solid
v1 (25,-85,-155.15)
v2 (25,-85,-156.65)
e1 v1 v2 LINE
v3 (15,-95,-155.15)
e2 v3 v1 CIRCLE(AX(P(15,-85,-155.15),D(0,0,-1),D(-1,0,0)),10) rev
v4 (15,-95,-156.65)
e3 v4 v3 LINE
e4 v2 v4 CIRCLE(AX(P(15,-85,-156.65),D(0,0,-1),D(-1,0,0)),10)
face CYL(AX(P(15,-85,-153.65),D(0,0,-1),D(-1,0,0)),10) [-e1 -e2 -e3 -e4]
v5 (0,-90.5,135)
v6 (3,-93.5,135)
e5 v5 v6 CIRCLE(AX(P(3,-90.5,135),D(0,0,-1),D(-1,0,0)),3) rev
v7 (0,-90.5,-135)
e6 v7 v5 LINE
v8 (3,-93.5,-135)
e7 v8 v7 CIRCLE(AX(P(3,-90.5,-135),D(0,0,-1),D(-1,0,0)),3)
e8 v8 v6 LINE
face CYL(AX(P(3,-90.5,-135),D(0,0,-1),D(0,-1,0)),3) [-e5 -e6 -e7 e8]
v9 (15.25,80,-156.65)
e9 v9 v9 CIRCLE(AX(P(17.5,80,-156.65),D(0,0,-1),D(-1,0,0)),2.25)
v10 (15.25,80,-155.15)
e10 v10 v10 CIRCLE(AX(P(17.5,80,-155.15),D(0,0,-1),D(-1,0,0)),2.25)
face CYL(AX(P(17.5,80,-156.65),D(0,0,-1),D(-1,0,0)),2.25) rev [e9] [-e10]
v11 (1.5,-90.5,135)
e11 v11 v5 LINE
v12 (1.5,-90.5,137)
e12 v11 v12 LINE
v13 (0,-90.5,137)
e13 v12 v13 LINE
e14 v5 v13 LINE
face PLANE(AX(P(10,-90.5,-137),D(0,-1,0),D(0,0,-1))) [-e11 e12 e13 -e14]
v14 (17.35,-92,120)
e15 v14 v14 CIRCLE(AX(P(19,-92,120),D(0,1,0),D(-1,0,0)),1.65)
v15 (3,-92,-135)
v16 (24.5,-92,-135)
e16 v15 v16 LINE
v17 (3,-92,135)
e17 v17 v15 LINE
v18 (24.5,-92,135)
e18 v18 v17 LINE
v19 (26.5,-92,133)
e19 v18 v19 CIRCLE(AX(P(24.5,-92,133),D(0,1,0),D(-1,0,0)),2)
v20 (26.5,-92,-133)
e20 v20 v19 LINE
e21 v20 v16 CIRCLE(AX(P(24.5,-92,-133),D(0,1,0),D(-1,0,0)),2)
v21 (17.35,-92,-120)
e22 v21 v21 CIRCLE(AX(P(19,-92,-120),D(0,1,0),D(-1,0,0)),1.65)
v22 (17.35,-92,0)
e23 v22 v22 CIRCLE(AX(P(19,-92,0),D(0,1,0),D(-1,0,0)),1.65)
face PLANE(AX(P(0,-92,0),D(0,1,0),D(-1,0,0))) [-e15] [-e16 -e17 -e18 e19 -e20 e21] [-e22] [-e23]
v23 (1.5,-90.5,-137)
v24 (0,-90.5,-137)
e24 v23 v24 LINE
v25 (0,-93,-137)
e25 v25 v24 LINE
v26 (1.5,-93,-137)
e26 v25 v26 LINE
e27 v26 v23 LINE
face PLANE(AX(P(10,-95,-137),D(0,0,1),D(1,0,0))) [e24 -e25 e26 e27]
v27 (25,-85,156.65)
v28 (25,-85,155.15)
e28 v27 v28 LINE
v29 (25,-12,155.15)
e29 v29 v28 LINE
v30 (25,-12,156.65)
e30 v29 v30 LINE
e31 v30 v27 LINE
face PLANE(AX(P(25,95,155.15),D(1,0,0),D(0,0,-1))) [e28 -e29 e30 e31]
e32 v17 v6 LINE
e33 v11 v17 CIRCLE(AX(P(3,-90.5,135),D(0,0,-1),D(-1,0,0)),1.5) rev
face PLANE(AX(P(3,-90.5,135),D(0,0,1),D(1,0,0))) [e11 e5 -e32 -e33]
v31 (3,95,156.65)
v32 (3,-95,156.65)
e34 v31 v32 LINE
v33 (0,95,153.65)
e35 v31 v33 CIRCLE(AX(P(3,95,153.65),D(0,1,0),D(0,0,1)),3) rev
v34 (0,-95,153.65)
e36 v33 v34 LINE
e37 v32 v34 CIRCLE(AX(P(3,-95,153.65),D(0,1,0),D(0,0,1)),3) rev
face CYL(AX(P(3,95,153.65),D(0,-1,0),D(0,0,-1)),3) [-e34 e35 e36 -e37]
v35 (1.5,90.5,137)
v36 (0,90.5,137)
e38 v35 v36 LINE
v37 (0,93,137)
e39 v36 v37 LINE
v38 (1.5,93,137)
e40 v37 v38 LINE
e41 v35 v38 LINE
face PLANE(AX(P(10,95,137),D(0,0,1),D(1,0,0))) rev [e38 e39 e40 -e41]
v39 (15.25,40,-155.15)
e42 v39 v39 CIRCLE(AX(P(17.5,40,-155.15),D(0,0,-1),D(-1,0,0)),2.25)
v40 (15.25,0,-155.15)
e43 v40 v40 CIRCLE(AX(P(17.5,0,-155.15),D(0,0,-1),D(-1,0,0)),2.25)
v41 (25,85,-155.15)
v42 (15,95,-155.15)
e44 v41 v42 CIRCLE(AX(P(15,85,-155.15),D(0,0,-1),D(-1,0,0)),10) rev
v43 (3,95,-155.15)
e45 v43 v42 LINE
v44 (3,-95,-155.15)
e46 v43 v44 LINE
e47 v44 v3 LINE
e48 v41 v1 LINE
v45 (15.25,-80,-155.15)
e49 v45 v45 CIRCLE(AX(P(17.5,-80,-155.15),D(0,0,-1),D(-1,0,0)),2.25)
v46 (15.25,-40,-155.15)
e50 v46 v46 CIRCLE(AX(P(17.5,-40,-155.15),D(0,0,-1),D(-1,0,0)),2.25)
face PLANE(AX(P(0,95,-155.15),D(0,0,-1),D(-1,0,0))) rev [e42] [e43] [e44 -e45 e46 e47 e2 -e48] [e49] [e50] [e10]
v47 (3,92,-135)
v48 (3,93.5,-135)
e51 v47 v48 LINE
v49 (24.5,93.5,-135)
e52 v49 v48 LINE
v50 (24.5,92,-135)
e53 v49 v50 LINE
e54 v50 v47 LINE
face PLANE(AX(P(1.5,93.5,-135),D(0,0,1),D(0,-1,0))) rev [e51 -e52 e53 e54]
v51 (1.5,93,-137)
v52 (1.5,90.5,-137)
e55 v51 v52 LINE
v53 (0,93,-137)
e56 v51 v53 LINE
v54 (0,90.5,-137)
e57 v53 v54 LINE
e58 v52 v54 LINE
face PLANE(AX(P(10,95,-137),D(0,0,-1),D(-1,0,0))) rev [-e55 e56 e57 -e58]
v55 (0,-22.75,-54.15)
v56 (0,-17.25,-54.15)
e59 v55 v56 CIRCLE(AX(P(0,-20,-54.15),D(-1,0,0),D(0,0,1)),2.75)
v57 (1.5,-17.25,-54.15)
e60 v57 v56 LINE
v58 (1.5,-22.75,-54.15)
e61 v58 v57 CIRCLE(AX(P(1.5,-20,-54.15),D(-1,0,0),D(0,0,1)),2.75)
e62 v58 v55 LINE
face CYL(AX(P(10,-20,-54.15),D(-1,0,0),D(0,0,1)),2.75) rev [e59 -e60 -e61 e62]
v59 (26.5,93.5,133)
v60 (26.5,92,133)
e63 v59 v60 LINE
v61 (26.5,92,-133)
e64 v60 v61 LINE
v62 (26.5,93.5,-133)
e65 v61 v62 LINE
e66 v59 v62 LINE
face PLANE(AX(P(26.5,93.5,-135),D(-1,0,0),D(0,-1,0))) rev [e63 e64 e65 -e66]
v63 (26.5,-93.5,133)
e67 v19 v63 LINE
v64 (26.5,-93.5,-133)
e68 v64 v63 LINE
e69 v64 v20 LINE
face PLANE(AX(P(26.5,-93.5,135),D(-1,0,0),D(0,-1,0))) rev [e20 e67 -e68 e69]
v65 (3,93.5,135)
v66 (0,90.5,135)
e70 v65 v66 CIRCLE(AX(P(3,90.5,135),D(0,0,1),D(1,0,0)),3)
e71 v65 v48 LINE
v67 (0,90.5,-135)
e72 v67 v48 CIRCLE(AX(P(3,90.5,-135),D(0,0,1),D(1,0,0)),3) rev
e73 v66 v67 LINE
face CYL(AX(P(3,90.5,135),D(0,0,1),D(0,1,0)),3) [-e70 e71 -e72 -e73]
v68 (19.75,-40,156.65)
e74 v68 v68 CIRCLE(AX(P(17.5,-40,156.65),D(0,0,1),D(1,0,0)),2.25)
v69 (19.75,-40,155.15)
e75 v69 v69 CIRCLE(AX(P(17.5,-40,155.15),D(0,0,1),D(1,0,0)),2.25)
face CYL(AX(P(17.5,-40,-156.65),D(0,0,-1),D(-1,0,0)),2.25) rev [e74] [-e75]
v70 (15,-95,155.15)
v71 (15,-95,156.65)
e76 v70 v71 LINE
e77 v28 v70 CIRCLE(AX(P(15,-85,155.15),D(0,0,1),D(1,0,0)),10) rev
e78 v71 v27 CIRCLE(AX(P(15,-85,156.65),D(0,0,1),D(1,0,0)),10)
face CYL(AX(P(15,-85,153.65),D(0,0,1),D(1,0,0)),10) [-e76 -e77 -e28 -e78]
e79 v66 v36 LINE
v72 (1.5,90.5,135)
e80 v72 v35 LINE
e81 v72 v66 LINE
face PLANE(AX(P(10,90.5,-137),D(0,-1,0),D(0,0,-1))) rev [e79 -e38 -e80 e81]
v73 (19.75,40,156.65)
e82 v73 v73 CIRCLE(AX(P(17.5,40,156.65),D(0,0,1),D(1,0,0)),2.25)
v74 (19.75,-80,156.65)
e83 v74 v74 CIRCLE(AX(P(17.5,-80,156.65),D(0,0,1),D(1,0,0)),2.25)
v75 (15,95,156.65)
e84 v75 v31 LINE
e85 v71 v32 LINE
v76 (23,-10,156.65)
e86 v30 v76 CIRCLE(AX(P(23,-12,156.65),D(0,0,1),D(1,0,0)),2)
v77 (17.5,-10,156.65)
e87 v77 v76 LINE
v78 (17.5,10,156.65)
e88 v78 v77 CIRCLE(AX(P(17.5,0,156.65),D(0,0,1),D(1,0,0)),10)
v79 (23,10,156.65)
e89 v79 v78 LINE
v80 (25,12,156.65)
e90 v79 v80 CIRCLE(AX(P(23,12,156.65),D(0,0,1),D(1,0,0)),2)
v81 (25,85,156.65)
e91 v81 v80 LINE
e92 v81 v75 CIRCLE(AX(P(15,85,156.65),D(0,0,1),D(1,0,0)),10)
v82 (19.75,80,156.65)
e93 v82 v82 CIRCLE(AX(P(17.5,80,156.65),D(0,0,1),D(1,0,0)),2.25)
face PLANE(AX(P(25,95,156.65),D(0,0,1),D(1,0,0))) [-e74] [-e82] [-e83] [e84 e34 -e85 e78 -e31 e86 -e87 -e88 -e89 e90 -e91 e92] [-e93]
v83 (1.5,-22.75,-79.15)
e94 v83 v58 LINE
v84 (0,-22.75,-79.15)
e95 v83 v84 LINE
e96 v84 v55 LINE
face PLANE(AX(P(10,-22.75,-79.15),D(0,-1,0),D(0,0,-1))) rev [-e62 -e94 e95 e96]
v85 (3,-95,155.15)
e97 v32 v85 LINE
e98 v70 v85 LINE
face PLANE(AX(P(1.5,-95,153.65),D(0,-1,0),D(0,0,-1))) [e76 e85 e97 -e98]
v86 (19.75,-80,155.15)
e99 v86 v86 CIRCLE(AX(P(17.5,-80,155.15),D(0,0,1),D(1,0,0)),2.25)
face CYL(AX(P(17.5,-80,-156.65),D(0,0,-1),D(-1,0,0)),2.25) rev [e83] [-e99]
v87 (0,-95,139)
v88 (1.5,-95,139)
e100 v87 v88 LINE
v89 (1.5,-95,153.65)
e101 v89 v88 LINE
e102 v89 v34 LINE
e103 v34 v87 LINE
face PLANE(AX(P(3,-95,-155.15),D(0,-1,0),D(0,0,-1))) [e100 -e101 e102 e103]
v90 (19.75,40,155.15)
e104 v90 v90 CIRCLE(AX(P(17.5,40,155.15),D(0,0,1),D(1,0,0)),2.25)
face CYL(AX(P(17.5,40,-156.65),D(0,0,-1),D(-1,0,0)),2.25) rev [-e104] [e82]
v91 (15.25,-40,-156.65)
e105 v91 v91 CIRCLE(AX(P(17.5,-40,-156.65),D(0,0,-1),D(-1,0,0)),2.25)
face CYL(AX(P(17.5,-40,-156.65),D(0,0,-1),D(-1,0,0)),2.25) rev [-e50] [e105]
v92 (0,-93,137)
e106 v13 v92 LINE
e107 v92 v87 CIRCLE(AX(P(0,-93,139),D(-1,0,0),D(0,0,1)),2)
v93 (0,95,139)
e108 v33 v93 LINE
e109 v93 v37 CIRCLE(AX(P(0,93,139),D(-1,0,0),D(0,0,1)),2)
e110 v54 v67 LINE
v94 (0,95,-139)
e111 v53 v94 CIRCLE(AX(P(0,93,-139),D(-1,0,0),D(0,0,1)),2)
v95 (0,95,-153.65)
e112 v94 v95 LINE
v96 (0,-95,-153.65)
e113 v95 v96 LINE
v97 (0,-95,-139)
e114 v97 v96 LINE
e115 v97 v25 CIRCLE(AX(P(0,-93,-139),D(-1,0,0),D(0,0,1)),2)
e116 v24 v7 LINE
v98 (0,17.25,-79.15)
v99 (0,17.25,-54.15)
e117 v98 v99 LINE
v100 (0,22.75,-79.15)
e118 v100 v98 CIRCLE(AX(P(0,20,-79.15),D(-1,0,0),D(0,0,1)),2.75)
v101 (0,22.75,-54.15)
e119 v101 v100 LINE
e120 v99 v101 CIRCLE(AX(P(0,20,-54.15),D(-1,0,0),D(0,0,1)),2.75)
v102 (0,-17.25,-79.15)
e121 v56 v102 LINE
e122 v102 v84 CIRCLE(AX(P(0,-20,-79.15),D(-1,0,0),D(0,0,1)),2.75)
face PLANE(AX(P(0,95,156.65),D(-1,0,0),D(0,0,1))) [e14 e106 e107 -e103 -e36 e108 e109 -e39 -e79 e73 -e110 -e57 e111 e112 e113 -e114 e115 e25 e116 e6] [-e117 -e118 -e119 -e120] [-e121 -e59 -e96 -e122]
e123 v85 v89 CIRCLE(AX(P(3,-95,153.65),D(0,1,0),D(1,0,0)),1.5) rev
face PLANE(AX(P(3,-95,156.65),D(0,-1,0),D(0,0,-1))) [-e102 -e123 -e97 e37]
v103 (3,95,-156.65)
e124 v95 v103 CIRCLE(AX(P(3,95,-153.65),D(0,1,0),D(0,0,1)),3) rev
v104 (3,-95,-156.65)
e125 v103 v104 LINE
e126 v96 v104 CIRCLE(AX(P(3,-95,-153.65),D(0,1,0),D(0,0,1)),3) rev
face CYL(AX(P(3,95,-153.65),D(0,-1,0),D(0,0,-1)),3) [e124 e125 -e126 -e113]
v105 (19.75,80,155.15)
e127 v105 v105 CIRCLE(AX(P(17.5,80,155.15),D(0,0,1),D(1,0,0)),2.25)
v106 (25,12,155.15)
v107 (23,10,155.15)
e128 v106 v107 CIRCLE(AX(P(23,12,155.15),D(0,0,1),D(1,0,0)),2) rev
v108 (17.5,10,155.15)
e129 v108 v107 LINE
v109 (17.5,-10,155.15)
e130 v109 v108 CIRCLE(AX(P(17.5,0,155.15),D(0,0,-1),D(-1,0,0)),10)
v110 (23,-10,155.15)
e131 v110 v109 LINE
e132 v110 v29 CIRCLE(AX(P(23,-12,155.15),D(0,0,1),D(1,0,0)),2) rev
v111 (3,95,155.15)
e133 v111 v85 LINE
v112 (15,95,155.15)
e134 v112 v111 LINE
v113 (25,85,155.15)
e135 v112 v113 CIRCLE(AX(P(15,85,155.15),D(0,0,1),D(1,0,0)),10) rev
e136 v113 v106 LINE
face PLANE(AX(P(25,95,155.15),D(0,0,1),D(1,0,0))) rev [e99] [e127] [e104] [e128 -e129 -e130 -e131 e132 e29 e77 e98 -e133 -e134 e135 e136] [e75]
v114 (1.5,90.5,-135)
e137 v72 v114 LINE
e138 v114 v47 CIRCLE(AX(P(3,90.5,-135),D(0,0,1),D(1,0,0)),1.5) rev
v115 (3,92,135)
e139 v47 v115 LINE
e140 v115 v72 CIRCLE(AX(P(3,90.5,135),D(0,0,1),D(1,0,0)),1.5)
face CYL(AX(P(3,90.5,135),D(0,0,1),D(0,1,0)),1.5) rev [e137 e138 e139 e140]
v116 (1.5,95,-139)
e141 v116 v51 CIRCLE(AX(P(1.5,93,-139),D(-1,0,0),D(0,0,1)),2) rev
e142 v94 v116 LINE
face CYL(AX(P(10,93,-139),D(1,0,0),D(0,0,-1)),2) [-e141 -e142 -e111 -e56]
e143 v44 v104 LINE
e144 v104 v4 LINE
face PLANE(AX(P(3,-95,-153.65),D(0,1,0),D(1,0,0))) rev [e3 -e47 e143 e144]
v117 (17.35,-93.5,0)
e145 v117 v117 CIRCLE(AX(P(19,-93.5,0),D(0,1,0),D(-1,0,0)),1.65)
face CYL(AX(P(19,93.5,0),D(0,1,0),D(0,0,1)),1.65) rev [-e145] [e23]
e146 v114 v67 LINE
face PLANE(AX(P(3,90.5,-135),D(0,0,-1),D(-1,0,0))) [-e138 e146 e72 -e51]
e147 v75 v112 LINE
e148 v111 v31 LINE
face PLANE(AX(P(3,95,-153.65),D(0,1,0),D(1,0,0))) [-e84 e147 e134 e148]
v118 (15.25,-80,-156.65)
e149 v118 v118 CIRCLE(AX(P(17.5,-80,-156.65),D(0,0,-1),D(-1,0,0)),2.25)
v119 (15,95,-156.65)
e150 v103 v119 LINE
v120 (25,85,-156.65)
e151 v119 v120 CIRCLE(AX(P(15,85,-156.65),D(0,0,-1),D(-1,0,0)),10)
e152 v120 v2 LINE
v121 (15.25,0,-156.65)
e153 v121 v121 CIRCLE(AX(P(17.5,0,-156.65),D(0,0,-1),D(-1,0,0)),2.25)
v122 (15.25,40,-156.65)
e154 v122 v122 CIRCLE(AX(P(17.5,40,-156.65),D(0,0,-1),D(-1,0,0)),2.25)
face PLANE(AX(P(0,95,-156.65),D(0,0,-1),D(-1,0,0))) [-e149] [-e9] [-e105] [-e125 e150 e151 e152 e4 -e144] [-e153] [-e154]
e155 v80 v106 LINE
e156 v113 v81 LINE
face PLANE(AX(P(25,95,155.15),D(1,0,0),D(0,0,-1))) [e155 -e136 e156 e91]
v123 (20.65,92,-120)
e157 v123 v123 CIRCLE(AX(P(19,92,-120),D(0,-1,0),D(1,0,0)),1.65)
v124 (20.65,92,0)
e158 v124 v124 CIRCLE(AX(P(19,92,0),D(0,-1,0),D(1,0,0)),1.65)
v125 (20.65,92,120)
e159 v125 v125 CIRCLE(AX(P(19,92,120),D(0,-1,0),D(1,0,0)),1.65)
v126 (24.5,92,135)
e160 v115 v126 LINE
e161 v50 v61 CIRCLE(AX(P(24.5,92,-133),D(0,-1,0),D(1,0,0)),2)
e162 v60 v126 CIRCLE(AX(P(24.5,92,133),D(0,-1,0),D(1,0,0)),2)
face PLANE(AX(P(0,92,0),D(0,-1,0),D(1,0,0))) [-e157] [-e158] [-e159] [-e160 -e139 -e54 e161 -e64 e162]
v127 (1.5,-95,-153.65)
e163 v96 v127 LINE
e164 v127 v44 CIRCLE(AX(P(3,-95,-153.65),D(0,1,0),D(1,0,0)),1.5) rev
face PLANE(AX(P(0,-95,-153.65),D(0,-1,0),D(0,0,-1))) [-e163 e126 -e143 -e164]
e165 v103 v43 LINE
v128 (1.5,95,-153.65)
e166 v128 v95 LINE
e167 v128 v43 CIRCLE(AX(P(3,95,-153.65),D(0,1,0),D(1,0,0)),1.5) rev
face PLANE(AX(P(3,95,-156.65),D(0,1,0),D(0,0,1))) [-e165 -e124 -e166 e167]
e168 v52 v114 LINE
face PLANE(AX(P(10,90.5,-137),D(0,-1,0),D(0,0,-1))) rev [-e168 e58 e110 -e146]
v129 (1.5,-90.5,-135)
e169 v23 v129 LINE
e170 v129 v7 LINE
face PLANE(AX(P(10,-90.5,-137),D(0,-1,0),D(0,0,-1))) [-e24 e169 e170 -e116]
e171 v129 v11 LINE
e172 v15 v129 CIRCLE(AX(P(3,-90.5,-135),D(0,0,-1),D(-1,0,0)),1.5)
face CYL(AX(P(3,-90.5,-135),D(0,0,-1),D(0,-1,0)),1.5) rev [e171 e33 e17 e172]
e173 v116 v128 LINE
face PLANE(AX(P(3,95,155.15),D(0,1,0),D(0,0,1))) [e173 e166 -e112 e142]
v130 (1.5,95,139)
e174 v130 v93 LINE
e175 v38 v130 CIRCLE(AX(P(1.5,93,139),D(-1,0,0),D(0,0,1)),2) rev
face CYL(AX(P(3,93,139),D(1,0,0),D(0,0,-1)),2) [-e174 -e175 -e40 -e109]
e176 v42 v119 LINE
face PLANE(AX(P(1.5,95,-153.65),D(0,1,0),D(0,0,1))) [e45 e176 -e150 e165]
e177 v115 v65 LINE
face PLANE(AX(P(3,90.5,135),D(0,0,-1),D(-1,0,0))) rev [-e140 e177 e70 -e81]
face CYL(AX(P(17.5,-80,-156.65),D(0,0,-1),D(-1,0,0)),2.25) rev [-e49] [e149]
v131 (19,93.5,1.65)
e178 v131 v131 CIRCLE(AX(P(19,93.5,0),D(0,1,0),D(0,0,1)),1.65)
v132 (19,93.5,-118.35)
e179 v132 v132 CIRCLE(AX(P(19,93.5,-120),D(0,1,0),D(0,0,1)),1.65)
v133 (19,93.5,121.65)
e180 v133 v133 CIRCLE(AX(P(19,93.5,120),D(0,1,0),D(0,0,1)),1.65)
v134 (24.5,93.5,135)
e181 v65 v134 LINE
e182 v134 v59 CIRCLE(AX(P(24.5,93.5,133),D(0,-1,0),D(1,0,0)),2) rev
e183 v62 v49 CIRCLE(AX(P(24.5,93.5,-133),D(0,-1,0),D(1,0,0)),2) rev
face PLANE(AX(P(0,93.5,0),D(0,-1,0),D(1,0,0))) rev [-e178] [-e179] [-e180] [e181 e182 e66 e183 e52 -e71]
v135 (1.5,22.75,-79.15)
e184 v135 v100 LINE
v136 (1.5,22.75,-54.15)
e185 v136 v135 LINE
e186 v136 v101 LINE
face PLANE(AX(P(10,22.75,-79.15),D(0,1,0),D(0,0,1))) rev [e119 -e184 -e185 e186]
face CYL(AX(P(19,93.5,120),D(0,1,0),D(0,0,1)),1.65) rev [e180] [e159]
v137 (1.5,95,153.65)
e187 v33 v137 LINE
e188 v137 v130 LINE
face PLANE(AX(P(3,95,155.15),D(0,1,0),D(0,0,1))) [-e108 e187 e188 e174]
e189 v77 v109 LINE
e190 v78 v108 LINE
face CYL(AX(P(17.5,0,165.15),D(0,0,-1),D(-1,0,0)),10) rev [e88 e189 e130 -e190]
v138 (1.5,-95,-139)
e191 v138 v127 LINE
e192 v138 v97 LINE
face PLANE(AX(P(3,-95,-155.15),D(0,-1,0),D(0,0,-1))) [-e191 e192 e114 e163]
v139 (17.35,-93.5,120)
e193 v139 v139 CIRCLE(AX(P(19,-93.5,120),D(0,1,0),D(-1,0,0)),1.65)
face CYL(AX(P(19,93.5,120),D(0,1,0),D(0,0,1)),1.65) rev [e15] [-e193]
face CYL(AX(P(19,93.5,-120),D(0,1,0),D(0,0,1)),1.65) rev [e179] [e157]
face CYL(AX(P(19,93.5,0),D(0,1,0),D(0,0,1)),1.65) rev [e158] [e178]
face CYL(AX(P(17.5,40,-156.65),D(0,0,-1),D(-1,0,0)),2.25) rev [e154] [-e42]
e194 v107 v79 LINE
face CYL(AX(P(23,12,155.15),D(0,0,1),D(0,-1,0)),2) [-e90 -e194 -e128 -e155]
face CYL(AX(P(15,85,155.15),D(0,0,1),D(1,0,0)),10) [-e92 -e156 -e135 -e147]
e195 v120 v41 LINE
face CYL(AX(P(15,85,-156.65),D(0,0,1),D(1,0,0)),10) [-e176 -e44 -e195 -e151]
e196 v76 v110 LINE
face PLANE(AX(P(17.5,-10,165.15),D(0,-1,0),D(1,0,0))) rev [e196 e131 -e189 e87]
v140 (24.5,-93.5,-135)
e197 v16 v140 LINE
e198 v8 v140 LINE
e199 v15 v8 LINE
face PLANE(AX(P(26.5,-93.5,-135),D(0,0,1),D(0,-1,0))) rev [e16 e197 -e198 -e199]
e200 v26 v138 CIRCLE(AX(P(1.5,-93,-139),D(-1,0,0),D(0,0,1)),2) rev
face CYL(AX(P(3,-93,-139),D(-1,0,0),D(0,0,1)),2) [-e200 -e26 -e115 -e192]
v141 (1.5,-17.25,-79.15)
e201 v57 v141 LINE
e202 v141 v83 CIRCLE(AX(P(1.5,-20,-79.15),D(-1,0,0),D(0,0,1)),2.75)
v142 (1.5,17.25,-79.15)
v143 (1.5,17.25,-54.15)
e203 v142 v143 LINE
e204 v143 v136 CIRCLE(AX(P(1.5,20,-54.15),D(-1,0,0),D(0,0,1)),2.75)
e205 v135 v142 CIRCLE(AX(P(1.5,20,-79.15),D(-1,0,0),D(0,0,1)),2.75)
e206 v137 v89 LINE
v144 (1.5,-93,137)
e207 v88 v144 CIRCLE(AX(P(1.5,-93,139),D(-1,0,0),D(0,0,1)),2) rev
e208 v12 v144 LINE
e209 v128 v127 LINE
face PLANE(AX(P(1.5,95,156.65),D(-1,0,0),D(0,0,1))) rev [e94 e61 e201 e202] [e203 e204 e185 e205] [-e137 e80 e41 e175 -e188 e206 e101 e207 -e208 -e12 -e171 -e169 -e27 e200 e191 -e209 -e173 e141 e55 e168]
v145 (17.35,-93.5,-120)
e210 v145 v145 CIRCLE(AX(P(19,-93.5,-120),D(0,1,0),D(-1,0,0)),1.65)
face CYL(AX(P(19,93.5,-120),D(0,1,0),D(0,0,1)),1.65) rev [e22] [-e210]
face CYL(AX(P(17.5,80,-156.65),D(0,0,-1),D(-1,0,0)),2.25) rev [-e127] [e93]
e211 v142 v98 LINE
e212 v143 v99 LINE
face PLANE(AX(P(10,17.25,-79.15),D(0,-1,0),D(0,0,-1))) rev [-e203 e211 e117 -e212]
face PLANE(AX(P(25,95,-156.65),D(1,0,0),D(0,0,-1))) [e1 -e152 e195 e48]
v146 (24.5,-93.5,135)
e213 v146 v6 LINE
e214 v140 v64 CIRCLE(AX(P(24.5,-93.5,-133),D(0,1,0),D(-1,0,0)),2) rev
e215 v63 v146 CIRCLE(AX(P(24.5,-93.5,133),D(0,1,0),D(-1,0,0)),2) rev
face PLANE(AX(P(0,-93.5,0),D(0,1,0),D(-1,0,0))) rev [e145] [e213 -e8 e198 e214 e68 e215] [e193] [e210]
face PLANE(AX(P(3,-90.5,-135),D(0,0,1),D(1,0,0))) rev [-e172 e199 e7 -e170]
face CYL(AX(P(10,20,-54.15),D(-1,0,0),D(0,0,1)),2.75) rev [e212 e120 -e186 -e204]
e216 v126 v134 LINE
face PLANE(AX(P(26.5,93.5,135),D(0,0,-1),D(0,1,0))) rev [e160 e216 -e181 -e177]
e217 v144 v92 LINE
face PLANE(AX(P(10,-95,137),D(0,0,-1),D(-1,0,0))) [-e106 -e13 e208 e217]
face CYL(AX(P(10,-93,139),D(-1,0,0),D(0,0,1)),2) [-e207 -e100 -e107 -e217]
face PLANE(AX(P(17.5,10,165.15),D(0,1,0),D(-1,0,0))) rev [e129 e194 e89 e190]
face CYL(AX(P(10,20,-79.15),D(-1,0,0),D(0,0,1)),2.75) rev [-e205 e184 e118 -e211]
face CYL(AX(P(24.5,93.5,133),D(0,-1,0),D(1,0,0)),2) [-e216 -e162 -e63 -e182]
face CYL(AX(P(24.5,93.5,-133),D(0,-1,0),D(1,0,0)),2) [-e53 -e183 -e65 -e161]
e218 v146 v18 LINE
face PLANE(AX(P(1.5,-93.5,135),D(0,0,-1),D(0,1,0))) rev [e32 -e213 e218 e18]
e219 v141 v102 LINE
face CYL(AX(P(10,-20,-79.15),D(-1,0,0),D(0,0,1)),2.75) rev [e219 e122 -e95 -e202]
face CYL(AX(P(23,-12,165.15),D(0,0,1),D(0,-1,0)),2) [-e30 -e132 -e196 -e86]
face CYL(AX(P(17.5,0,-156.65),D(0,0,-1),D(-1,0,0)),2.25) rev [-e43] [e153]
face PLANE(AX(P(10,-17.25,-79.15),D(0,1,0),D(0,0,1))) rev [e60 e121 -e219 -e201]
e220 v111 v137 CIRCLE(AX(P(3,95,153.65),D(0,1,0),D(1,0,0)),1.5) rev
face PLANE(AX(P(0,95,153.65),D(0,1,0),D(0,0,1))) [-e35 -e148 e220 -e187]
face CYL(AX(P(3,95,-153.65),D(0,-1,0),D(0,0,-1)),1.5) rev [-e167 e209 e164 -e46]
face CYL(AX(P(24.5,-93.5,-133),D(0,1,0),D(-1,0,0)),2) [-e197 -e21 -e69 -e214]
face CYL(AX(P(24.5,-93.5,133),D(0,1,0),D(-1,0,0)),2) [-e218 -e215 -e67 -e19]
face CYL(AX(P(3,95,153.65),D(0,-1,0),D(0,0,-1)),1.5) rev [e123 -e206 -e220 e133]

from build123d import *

# Parameters (mm, degrees)
BRIDA_BASE1_DEPTH           = 95
CROQUIS4_W                  = 274
CROQUIS4_H                  = 4.5
CORTAR_EXTRUIR1_DEPTH       = 10
BRIDA_DE_ARISTA1_DEPTH      = 270
BRIDA_DE_ARISTA1_BEND_DEPTH = 270
MATRIZL1_COUNT              = 3
MATRIZL1_PITCH              = 40
MATRIZL1_COL_COUNT          = 3
MATRIZL1_COL_PITCH          = 40
REDONDEO1_R                 = 10
TALADRO_ROSCADO_M41_D       = 3.3
MATRIZL2_COUNT              = 2
MATRIZL2_PITCH              = 120
MATRIZL2_COL_COUNT          = 2
MATRIZL2_COL_PITCH          = 120
CORTAR_EXTRUIR3_DEPTH       = 10
REDONDEO2_R                 = 2
CORTAR_EXTRUIR4_DEPTH       = 10


# Sheet-metal steps are written as plain solids
with BuildPart() as part:
    # Croquis1 → Brida base1 (new, symmetric)
    with BuildSketch(Plane(origin=(0, 0, 0), x_dir=(1, 0, 0), z_dir=(0, 1, 0))):
        with BuildLine():
            Line((25, -156.65), (3, -156.65))
            ThreePointArc((3, -156.65), (0.878679656, -155.771320344), (0, -153.65))
            Line((0, -153.65), (0, 153.65))
            ThreePointArc((0, 153.65), (0.878679656, 155.771320344), (3, 156.65))
            Line((3, 156.65), (25, 156.65))
            Line((25, 156.65), (25, 155.15))
            Line((25, 155.15), (3, 155.15))
            ThreePointArc((3, 155.15), (1.939339828, 154.710660172), (1.5, 153.65))
            Line((1.5, 153.65), (1.5, -153.65))
            ThreePointArc((1.5, -153.65), (1.939339828, -154.710660172), (3, -155.15))
            Line((3, -155.15), (25, -155.15))
            Line((25, -155.15), (25, -156.65))
        make_face()
    extrude(amount=BRIDA_BASE1_DEPTH, both=True)

    # Croquis4 → Cortar-Extruir1 (cut)
    with BuildSketch(Plane.ZY):
        with Locations((0, 92.75)):
            Rectangle(CROQUIS4_W, CROQUIS4_H)
    cortar_extruir1 = extrude(amount=-CORTAR_EXTRUIR1_DEPTH, mode=Mode.SUBTRACT)

    # Simetría3: Cortar-Extruir1 across plane
    add(cortar_extruir1.mirror(Plane.ZX), mode=Mode.SUBTRACT)

    # Brida de arista1 section (across the edge) → Brida de arista1 (add)
    with BuildSketch(Plane(origin=(1.5, 92, -135), x_dir=(0, -1, 0), z_dir=(0, 0, 1))):
        with BuildLine():
            Line((-1.5, 1.5), (-1.5, 25))
            Line((-1.5, 25), (0, 25))
            Line((0, 25), (0, 1.5))
            ThreePointArc((0, 1.5), (0.439339828, 0.439339828), (1.5, 0))
            Line((1.5, 0), (1.5, -1.5))
            ThreePointArc((1.5, -1.5), (-0.621320344, -0.621320344), (-1.5, 1.5))
        make_face()
    extrude(amount=BRIDA_DE_ARISTA1_DEPTH)

    # Brida de arista1 section 2 (across the edge) → Brida de arista1 bend (add)
    with BuildSketch(Plane(origin=(1.5, -92, 135), x_dir=(0, 1, 0), z_dir=(0, 0, -1))):
        with BuildLine():
            Line((-1.5, 1.5), (-1.5, 25))
            Line((-1.5, 25), (0, 25))
            Line((0, 25), (0, 1.5))
            ThreePointArc((0, 1.5), (0.439339828, 0.439339828), (1.5, 0))
            Line((1.5, 0), (1.5, -1.5))
            ThreePointArc((1.5, -1.5), (-0.621320344, -0.621320344), (-1.5, 1.5))
        make_face()
    extrude(amount=BRIDA_DE_ARISTA1_BEND_DEPTH)

    # Croquis11 → Taladro de margen para M41 (revolve, cut)
    with BuildSketch(Plane(origin=(17.5, 0, -156.65), x_dir=(0, 1, 0), z_dir=(1, 0, 0))):
        Polygon((0, 0), (0, 501.351936393), (2.25, 500), (2.25, 0), align=None)
    taladro_de_margen_para_m41 = revolve(axis=Axis((17.5, 0, -163), (0, 0, 1)), mode=Mode.SUBTRACT)

    # MatrizL1: Taladro de margen para M41 ×3
    with Locations(*[(0, -i * MATRIZL1_PITCH, 0) for i in range(1, MATRIZL1_COUNT)]):
        add(taladro_de_margen_para_m41, mode=Mode.SUBTRACT)

    # MatrizL1 col: Taladro de margen para M41 ×3
    with Locations(*[(0, i * MATRIZL1_COL_PITCH, 0) for i in range(1, MATRIZL1_COL_COUNT)]):
        add(taladro_de_margen_para_m41, mode=Mode.SUBTRACT)

    # Redondeo1
    redondeo1_edges = [part.edges().sort_by_distance(p)[0] for p in [
        (25, -95, 155.9),
        (25, -95, -155.9),
        (25, 95, 155.9),
        (25, 95, -155.9),
    ]]
    fillet(redondeo1_edges, radius=REDONDEO1_R)

    # Taladro roscado M41 (through all)
    with Locations(Plane(origin=(0, 93.5, 0), x_dir=(1, 0, 0), z_dir=(0, 1, 0))):
        with Locations((19, 0)):
            taladro_roscado_m41 = Hole(TALADRO_ROSCADO_M41_D / 2)

    # MatrizL2: Taladro roscado M41 ×2
    with Locations(*[(0, 0, i * MATRIZL2_PITCH) for i in range(1, MATRIZL2_COUNT)]):
        add(taladro_roscado_m41, mode=Mode.SUBTRACT)

    # MatrizL2 col: Taladro roscado M41 ×2
    with Locations(*[(0, 0, -i * MATRIZL2_COL_PITCH) for i in range(1, MATRIZL2_COL_COUNT)]):
        add(taladro_roscado_m41, mode=Mode.SUBTRACT)

    # Croquis20 → Cortar-Extruir3 (cut)
    with BuildSketch(Plane(origin=(0, 0, 155.15), x_dir=(-1, 0, 0), z_dir=(0, 0, -1))):
        with BuildLine():
            Line((-17.5, -10), (-25, -10))
            ThreePointArc((-25, -10), (-35, 0), (-25, 10))
            Line((-25, 10), (-17.5, 10))
            ThreePointArc((-17.5, 10), (-7.5, 0), (-17.5, -10))
        make_face()
    extrude(amount=-CORTAR_EXTRUIR3_DEPTH, mode=Mode.SUBTRACT)

    # Redondeo2
    redondeo2_edges = [part.edges().sort_by_distance(p)[0] for p in [
        (26.5, -92.75, 135),
        (26.5, -92.75, -135),
        (25, -10, 155.9),
        (25, 10, 155.9),
        (0.75, 95, -137),
        (0.75, 95, 137),
        (0.75, -95, -137),
        (0.75, -95, 137),
        (26.5, 92.75, -135),
        (26.5, 92.75, 135),
    ]]
    fillet(redondeo2_edges, radius=REDONDEO2_R)

    # Croquis21 → Cortar-Extruir4 (cut)
    with BuildSketch(Plane.ZY):
        with BuildLine():
            Line((-79.15, -17.25), (-54.15, -17.25))
            ThreePointArc((-54.15, -17.25), (-51.4, -20), (-54.15, -22.75))
            Line((-54.15, -22.75), (-79.15, -22.75))
            ThreePointArc((-79.15, -22.75), (-81.9, -20), (-79.15, -17.25))
        make_face()
        with BuildLine():
            Line((-79.15, 22.75), (-54.15, 22.75))
            ThreePointArc((-54.15, 22.75), (-51.4, 20), (-54.15, 17.25))
            Line((-54.15, 17.25), (-79.15, 17.25))
            ThreePointArc((-79.15, 17.25), (-81.9, 20), (-79.15, 22.75))
        make_face()
    extrude(amount=-CORTAR_EXTRUIR4_DEPTH, mode=Mode.SUBTRACT)


solid = part.part
